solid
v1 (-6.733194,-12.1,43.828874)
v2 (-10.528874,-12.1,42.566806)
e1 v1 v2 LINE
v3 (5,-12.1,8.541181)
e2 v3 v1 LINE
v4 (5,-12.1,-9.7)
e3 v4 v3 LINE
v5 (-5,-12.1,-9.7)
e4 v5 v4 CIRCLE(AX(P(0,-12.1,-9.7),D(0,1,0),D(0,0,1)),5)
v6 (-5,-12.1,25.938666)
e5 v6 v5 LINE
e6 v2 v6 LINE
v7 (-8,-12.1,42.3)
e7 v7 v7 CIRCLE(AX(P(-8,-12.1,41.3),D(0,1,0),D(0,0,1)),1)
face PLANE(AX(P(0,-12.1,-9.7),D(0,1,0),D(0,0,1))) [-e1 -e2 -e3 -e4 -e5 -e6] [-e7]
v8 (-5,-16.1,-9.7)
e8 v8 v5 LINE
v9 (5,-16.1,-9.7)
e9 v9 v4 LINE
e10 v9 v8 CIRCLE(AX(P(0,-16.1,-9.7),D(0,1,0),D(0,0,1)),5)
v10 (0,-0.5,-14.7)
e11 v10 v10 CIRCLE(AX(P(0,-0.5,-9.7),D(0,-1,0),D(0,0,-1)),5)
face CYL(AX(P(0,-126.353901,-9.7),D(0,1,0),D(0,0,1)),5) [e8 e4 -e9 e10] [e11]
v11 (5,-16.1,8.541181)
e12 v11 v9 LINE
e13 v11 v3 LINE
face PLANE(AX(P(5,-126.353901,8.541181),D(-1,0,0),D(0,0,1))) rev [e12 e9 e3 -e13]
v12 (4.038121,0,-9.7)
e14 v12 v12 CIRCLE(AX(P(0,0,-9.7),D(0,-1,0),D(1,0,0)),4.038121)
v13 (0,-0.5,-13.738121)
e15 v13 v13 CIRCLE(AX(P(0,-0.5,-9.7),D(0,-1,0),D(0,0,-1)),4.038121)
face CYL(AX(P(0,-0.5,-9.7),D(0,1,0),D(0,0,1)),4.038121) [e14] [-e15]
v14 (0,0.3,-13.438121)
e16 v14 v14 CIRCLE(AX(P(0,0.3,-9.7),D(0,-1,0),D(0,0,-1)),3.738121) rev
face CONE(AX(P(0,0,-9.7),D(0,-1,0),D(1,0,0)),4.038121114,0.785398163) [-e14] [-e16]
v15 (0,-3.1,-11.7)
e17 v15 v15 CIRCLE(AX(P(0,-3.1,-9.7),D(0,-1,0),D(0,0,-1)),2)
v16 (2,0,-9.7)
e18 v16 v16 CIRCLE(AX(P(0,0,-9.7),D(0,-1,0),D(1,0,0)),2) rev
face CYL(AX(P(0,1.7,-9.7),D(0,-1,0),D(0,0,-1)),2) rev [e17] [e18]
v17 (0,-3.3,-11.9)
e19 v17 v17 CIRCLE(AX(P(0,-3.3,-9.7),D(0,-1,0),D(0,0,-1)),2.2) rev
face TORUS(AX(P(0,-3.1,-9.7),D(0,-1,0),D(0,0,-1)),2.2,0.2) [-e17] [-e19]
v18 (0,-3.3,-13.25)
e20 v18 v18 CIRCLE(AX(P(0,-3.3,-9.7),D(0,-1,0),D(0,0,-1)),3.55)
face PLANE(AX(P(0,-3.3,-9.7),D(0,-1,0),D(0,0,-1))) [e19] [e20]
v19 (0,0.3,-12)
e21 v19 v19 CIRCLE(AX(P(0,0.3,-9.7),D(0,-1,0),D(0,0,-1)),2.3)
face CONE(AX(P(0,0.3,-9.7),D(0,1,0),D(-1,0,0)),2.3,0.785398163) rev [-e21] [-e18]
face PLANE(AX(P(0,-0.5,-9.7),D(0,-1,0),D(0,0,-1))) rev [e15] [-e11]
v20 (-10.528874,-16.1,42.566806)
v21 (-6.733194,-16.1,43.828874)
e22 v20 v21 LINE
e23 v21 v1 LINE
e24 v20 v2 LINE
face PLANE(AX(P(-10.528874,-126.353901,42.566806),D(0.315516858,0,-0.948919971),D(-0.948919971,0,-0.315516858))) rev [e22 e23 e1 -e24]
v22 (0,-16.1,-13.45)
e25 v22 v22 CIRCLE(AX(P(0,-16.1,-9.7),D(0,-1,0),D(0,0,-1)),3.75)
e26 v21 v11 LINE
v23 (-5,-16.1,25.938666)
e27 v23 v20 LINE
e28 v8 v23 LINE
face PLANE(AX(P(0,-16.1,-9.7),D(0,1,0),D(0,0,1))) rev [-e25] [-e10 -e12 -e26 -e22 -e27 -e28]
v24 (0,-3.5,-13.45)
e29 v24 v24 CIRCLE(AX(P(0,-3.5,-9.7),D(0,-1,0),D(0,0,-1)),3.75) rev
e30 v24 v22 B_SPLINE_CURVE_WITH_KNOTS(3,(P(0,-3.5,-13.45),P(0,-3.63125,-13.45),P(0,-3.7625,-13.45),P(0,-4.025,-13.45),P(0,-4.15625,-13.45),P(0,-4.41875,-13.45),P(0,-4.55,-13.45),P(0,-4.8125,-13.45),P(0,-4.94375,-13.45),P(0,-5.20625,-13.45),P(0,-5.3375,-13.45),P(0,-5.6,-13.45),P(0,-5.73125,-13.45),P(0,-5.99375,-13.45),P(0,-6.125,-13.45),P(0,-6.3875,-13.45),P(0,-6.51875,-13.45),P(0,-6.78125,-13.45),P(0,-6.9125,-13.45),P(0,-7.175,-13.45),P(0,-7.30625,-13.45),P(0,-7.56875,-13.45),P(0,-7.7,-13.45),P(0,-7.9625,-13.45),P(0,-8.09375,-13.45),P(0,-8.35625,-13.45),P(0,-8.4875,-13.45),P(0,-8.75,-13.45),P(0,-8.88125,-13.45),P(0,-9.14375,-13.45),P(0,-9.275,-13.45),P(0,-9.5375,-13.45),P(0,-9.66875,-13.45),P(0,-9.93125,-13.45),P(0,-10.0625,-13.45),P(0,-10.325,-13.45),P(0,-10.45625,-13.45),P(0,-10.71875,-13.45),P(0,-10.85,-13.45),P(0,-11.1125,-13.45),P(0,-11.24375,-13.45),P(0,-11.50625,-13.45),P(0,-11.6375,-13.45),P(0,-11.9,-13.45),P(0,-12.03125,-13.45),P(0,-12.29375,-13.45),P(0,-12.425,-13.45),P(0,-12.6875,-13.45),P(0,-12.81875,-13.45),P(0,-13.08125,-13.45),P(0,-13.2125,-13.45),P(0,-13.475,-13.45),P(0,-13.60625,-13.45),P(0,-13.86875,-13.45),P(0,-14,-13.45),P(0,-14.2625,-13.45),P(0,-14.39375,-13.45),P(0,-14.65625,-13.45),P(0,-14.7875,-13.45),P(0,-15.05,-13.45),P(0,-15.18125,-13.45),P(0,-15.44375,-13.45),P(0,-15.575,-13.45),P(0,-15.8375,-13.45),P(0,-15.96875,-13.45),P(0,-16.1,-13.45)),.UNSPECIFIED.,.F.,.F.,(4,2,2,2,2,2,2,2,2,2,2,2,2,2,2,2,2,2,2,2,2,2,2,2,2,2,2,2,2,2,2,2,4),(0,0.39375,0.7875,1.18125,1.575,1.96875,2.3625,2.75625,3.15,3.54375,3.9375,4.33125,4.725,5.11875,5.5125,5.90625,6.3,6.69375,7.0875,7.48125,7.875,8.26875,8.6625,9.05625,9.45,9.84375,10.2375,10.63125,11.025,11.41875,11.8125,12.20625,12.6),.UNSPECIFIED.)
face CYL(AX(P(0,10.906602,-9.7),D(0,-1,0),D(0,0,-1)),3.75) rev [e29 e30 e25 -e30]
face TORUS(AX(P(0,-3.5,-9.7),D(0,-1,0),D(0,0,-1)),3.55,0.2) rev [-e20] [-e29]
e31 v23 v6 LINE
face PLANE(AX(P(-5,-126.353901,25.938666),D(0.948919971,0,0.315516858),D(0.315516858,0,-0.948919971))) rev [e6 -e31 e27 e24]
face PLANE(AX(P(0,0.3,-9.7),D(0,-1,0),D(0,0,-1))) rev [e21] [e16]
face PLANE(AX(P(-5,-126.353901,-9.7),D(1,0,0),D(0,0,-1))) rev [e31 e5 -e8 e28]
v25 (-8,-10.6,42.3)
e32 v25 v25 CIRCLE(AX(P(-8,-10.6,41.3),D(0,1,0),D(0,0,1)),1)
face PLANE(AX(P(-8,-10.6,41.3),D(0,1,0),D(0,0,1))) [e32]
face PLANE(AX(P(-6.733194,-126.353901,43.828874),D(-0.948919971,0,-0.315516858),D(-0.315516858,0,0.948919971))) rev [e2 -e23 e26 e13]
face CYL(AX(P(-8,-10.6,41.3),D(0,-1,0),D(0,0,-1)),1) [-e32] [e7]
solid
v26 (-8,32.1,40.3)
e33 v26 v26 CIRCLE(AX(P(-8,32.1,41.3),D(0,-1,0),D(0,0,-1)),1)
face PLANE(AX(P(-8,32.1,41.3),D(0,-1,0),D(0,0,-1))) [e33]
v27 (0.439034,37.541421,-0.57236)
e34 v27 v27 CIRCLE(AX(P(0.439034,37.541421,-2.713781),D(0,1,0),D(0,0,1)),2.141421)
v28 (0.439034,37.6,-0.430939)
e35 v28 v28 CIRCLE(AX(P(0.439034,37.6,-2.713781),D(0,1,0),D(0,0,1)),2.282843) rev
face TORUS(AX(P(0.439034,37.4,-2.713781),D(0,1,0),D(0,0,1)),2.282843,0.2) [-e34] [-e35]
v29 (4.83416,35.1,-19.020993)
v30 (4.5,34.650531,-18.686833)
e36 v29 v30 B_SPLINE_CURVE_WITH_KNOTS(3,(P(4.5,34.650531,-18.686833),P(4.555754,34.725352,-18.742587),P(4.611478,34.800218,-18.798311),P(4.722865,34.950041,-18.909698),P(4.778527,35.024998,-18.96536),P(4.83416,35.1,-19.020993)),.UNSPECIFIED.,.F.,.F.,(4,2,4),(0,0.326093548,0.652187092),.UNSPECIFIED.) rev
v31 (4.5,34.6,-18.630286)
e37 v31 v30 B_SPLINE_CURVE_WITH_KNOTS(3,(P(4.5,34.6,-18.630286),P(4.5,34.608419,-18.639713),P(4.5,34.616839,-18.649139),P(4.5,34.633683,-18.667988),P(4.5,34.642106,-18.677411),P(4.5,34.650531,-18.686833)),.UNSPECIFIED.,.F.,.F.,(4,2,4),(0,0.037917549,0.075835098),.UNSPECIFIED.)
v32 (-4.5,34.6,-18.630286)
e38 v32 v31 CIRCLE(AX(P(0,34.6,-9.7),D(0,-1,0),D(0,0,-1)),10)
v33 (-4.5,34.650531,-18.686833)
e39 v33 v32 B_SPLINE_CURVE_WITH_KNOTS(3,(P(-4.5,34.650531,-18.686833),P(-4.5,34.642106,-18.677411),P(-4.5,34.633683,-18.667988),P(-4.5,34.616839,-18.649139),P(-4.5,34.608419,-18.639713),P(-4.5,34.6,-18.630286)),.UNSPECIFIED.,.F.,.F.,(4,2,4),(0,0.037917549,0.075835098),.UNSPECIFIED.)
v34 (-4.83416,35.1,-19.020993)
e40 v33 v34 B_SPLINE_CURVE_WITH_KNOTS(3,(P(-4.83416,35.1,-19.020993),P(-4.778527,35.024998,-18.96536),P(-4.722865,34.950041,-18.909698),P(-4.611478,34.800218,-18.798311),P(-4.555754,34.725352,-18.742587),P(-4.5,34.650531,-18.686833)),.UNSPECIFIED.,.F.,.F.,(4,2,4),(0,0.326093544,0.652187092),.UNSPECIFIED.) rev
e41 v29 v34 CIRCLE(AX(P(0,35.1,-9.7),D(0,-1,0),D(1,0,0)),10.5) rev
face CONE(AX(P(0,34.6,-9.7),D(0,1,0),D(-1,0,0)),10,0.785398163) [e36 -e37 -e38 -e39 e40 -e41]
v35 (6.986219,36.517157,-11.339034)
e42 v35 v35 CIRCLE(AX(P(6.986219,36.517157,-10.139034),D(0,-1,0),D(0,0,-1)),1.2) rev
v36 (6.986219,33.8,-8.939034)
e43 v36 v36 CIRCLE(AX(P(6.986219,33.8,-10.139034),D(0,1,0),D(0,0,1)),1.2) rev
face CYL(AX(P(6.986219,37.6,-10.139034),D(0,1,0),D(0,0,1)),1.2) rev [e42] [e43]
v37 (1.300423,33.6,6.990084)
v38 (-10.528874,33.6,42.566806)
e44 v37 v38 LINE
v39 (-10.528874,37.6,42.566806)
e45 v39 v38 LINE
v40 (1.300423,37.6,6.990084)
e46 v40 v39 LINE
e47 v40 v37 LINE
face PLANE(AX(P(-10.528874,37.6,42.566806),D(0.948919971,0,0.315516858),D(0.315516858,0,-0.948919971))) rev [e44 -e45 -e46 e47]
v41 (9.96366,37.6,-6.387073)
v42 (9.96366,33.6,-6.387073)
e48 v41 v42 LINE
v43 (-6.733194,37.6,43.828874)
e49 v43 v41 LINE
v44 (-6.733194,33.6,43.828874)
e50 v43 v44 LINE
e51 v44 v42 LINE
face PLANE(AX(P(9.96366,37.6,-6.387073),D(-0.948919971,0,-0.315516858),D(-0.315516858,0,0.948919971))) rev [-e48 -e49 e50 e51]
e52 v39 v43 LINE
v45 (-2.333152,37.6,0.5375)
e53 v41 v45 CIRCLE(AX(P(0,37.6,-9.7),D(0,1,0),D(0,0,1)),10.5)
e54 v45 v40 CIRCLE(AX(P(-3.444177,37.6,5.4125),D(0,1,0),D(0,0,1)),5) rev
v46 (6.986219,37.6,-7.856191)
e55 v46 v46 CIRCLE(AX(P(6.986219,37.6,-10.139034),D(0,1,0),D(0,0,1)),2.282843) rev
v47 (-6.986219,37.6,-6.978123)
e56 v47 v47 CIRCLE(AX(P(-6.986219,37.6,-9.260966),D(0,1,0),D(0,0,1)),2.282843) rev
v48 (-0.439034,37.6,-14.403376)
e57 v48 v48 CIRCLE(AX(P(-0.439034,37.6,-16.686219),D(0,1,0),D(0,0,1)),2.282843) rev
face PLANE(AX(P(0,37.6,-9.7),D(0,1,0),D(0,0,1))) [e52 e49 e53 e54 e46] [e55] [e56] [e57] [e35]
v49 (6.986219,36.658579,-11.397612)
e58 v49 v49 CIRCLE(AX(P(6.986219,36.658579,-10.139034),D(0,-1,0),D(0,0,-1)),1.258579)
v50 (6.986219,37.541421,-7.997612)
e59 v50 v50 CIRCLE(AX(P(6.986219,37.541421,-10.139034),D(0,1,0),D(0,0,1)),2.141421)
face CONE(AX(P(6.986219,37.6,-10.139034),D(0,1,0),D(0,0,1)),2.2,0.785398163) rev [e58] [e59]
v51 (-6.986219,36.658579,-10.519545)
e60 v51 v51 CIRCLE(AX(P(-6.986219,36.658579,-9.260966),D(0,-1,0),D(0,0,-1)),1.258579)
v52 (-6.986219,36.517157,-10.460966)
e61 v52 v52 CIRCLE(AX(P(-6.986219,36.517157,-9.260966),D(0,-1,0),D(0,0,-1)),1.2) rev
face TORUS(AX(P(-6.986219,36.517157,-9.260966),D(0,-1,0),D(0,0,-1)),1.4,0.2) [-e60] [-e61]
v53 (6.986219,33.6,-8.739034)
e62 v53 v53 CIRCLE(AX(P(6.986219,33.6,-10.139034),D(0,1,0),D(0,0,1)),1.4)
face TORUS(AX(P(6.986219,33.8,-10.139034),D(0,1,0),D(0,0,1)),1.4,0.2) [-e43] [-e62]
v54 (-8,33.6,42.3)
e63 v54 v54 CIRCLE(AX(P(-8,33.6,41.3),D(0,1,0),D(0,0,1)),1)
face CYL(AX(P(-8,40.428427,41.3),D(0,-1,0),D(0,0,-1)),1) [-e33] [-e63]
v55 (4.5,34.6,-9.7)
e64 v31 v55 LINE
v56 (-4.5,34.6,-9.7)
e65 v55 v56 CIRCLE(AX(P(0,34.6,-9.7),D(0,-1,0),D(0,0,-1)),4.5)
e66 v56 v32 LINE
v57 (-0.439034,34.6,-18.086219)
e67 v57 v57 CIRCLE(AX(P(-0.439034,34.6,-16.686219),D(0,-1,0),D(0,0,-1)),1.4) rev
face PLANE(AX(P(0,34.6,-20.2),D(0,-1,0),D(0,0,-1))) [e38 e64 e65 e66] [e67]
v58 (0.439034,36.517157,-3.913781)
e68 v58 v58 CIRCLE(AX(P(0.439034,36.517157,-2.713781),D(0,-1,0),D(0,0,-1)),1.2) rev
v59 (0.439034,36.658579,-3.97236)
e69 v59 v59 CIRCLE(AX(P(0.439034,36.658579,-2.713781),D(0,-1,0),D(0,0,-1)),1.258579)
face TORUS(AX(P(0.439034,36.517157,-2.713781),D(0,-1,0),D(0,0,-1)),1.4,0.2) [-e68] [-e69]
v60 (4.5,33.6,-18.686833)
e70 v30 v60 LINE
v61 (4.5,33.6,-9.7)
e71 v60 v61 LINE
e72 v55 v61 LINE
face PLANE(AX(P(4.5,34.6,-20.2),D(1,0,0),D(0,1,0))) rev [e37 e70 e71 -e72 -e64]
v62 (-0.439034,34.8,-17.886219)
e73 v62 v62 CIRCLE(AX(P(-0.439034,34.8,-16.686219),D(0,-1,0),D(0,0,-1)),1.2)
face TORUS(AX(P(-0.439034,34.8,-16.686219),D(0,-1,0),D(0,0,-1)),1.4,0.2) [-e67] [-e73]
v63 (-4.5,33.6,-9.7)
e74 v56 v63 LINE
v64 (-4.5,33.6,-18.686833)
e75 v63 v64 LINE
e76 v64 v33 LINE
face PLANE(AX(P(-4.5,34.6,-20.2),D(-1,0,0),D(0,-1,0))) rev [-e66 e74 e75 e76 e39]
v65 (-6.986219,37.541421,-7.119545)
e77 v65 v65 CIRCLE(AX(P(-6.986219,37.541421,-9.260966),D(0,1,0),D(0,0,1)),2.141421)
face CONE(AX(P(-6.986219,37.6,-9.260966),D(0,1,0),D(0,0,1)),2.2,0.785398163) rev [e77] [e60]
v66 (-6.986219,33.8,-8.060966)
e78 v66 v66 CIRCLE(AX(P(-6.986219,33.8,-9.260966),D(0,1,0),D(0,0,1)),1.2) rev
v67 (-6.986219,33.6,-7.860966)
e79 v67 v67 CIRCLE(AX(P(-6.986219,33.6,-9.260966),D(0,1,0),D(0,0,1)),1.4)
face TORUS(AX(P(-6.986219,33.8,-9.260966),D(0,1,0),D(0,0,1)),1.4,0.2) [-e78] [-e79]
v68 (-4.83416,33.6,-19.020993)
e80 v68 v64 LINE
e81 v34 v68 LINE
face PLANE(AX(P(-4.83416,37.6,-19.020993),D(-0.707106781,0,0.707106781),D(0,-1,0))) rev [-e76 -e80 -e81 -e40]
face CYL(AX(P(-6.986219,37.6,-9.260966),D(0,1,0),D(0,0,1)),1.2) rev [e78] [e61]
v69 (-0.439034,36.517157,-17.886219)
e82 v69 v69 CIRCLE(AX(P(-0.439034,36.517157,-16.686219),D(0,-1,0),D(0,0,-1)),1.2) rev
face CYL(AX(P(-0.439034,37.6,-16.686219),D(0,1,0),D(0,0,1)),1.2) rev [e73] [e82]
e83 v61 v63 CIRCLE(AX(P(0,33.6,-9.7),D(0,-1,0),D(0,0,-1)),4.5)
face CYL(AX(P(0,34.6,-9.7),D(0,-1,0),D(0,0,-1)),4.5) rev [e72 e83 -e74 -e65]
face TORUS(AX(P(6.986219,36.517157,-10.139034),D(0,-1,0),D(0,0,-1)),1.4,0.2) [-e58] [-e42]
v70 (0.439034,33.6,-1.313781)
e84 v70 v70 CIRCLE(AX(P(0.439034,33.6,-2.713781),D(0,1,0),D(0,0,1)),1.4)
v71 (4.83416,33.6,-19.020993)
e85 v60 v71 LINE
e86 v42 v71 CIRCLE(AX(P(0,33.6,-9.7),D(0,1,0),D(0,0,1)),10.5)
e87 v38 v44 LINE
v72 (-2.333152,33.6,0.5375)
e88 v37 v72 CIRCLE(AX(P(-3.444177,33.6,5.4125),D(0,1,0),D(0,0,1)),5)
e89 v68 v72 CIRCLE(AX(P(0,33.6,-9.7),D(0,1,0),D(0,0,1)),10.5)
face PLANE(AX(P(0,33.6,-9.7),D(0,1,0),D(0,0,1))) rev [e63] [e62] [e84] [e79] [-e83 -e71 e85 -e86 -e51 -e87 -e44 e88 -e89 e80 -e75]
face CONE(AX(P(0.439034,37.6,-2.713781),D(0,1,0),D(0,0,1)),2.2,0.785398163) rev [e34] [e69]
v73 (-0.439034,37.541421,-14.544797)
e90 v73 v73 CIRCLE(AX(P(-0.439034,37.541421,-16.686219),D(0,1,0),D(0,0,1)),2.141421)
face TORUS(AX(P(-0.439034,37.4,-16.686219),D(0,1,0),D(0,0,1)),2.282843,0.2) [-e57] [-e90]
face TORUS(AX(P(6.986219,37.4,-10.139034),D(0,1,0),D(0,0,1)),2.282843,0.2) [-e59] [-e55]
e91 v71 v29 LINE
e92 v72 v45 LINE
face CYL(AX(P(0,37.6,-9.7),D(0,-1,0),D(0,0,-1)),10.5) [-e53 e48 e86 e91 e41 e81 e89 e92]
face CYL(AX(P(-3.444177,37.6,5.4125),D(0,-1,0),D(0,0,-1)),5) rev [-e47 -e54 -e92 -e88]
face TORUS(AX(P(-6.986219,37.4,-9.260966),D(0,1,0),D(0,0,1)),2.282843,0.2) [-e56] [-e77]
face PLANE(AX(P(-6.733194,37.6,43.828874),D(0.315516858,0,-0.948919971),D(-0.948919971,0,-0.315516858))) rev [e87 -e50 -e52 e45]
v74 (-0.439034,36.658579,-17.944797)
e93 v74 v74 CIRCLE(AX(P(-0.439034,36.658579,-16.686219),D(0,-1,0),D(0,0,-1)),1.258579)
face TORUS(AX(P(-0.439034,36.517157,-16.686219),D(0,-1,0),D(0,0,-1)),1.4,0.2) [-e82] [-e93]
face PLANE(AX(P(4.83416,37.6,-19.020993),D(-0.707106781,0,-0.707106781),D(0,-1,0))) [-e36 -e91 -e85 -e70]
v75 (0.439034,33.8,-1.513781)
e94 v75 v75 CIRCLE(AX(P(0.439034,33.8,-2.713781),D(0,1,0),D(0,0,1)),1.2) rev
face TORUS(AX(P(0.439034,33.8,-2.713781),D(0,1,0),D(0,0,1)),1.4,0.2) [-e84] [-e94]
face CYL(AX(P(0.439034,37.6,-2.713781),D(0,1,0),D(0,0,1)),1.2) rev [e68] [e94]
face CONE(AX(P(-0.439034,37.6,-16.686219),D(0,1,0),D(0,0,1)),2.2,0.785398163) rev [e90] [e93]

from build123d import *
from build123d.topology import SkipClean

# Parameters (mm, degrees)
SKETCH2_R                                           = 0.5
BOSS_EXTRUDE1_DEPTH                                 = 4
CSK_FOR_M2_COUNTERSUNK_FLAT_HEAD_SCREW1_D           = 2.4
CSK_FOR_M2_COUNTERSUNK_FLAT_HEAD_SCREW1_DEPTH       = 4
CSK_FOR_M2_COUNTERSUNK_FLAT_HEAD_SCREW1_CSINK_D     = 4.4
CSK_FOR_M2_COUNTERSUNK_FLAT_HEAD_SCREW1_CSINK_ANGLE = 90
CSK_FOR_M2_COUNTERSUNK_FLAT_HEAD_SCREW1_TIP         = 0.721032743
CUT_EXTRUDE1_DEPTH                                  = 1
BOSS_EXTRUDE2_START                                 = 0.2
SKETCH6_R                                           = 4.038121114
BOSS_EXTRUDE2_DEPTH                                 = 0.8
BOSS_EXTRUDE3_DEPTH                                 = 15.6
SKETCH11_R                                          = 3.75
CUT_EXTRUDE3_DEPTH                                  = 12.8
SKETCH10_R                                          = 2
CUT_EXTRUDE2_DEPTH                                  = 5
CHAMFER1_SIZE                                       = 0.3
FILLET3_R                                           = 0.2
CHAMFER2_SIZE                                       = 0.5
FILLET4_R                                           = 0.2
FILLET6_R                                           = 5
CUT_EXTRUDE4_DEPTH                                  = 11.6
SKETCH15_R                                          = 1
BOSS_EXTRUDE4_DEPTH                                 = 1.5
BOSS_EXTRUDE5_DEPTH                                 = 1.5
BOSS_EXTRUDE5_DEPTH_BACK                            = 4
SKETCH16_R                                          = 1


with BuildPart() as part:
    # Sketch2 → Boss-Extrude1 (new body)
    with BuildSketch(Plane(origin=(0, 33.6, 0), x_dir=(1, 0, 0), z_dir=(0, 1, 0))):
        with BuildLine():
            Line((9.9636597, 6.387072988), (-6.733193774, -43.828873659))
            Line((-6.733193774, -43.828873659), (-10.528873659, -42.566806226))
            Line((-10.528873659, -42.566806226), (3.566161148, -0.175854124))
            ThreePointArc((3.566161148, -0.175854124), (-7.518777568, 17.029255343), (9.9636597, 6.387072988))
        make_face()
        with Locations(Location((-8, -41.3, 0), (0, 0, 270))):
            Circle(SKETCH2_R, mode=Mode.SUBTRACT)
    extrude(amount=BOSS_EXTRUDE1_DEPTH)

    # CSK for M2 Countersunk Flat Head Screw1
    with Locations(Plane(origin=(0, 37.6, 0), x_dir=(1, 0, 0), z_dir=(0, 1, 0))):
        with Locations((0.439033788, 2.713781471), (6.986218529, 10.139033788), (-0.439033788, 16.686218529), (-6.986218529, 9.260966212)):
            CounterSinkHole(CSK_FOR_M2_COUNTERSUNK_FLAT_HEAD_SCREW1_D / 2, CSK_FOR_M2_COUNTERSUNK_FLAT_HEAD_SCREW1_CSINK_D / 2, depth=CSK_FOR_M2_COUNTERSUNK_FLAT_HEAD_SCREW1_DEPTH, counter_sink_angle=CSK_FOR_M2_COUNTERSUNK_FLAT_HEAD_SCREW1_CSINK_ANGLE)
            with Locations((0, 0, -(CSK_FOR_M2_COUNTERSUNK_FLAT_HEAD_SCREW1_DEPTH + CSK_FOR_M2_COUNTERSUNK_FLAT_HEAD_SCREW1_TIP / 2))):  # 118° drill point
                Cone(0, CSK_FOR_M2_COUNTERSUNK_FLAT_HEAD_SCREW1_D / 2, CSK_FOR_M2_COUNTERSUNK_FLAT_HEAD_SCREW1_TIP, mode=Mode.SUBTRACT)

    # Sketch5 → Cut-Extrude1 (cut)
    with BuildSketch(Plane.XZ.offset(-33.6)):
        with BuildLine():
            Line((-4.5, -20.2), (-4.5, -9.7))
            ThreePointArc((-4.5, -9.7), (0, -5.2), (4.5, -9.7))
            Line((4.5, -9.7), (4.5, -20.2))
            ThreePointArc((4.5, -20.2), (0, -24.7), (-4.5, -20.2))
        make_face()
    extrude(amount=-CUT_EXTRUDE1_DEPTH, mode=Mode.SUBTRACT)

    # Chamfer2
    # the kernel refuses this chamfer: 0.5, 0.37535302 mm, written as the material it takes off along each edge
    with BuildSketch(Plane(origin=(4.5, 34.6, -19.186832981), x_dir=(0.8957520847701005, 0, 0.4445539366938715), z_dir=(0, -1, 0))) as chamfer2_piece_1:
        with BuildLine():
            Line((0.373049134, 0), (CHAMFER2_SIZE * 0.444553936694, CHAMFER2_SIZE * 0.89575208477))
            Line((CHAMFER2_SIZE * 0.444553936694, CHAMFER2_SIZE * 0.89575208477), (0, 0))
            ThreePointArc((0, 0), (0.189712645, -0.001656381), (0.373049134, 0))
        make_face()
    extrude(amount=2.285841494, mode=Mode.SUBTRACT)
    with BuildSketch(Plane(origin=(-4.5, 34.6, -19.186832981), x_dir=(-0.8957520847700934, 0, 0.4445539366938859), z_dir=(0, -1, 0))) as chamfer2_piece_2:
        with BuildLine():
            Line((0.373049134, 0), (CHAMFER2_SIZE * 0.444553936694, -CHAMFER2_SIZE * 0.89575208477))
            Line((CHAMFER2_SIZE * 0.444553936694, -CHAMFER2_SIZE * 0.89575208477), (0, 0))
            ThreePointArc((0, 0), (0.189712645, 0.001656381), (0.373049134, 0))
        make_face()
    extrude(amount=2.285841494, mode=Mode.SUBTRACT)
    with BuildSketch(Plane(origin=(0, 34.6, -9.7), x_dir=(-0.5357432905270892, 0, -0.8443809132466265), z_dir=(-0.8443809132466265, 0, 0.5357432905270892))) as chamfer2_piece_3_section:
        Polygon((10.5, -CHAMFER2_SIZE), (10.5 - CHAMFER2_SIZE, 0), (10.5, 0), align=None)
    chamfer2_piece_3 = revolve(axis=Axis((0, 34.6, -9.7), (0, -1, 0)), revolution_arc=64.788667193, mode=Mode.PRIVATE)
    chamfer2_piece_3 = split(chamfer2_piece_3, bisect_by=Plane(origin=(-4.5, 34.6, -9.7), z_dir=(1, 0, 0)), keep=Keep.TOP, mode=Mode.PRIVATE)
    chamfer2_piece_3 = split(chamfer2_piece_3, bisect_by=Plane(origin=(4.5, 34.6, -9.7), z_dir=(-1, 0, 0)), keep=Keep.TOP, mode=Mode.PRIVATE)
    add(chamfer2_piece_3, mode=Mode.SUBTRACT)
    with BuildSketch(Plane(origin=(0, 34.6, -9.7), x_dir=(-0.5357432905270892, 0, -0.8443809132466265), z_dir=(-0.8443809132466265, 0, 0.5357432905270892))) as chamfer2_piece_4a_section:
        Polygon((10.5, -CHAMFER2_SIZE), (10.5 - CHAMFER2_SIZE, 0), (10.5, 0), align=None)
    chamfer2_piece_4a = revolve(axis=Axis((0, 34.6, -9.7), (0, -1, 0)), revolution_arc=64.788667193, mode=Mode.PRIVATE)
    chamfer2_piece_4a = split(chamfer2_piece_4a, bisect_by=Plane(origin=(4.5, 34.6, -9.7), z_dir=(1, 0, 0)), keep=Keep.TOP, mode=Mode.PRIVATE)
    with BuildSketch(Plane(origin=(4.5, 35.885841494, -19.186832981), x_dir=(0.8957520847701005, 0, 0.4445539366938715), z_dir=(0, -1, 0))) as chamfer2_piece_4b_section:
        with BuildLine():
            Line((0.373049134, 0), (CHAMFER2_SIZE * 0.444553936694, CHAMFER2_SIZE * 0.89575208477))
            Line((CHAMFER2_SIZE * 0.444553936694, CHAMFER2_SIZE * 0.89575208477), (0, 0))
            ThreePointArc((0, 0), (0.189712645, -0.001656381), (0.373049134, 0))
        make_face()
    chamfer2_piece_4b = extrude(amount=3.571682988, mode=Mode.PRIVATE)
    chamfer2_piece_4b = split(chamfer2_piece_4b, bisect_by=Plane(origin=(4.5, 34.6, -19.186832981), z_dir=(0, 1, 0)), keep=Keep.TOP, mode=Mode.PRIVATE)
    chamfer2_piece_4 = chamfer2_piece_4a & chamfer2_piece_4b
    add(chamfer2_piece_4, mode=Mode.SUBTRACT)
    with BuildSketch(Plane(origin=(-4.5, 35.885841494, -19.186832981), x_dir=(-0.8957520847700934, 0, 0.4445539366938859), z_dir=(0, -1, 0))) as chamfer2_piece_5a_section:
        with BuildLine():
            Line((0.373049134, 0), (CHAMFER2_SIZE * 0.444553936694, -CHAMFER2_SIZE * 0.89575208477))
            Line((CHAMFER2_SIZE * 0.444553936694, -CHAMFER2_SIZE * 0.89575208477), (0, 0))
            ThreePointArc((0, 0), (0.189712645, 0.001656381), (0.373049134, 0))
        make_face()
    chamfer2_piece_5a = extrude(amount=3.571682988, mode=Mode.PRIVATE)
    chamfer2_piece_5a = split(chamfer2_piece_5a, bisect_by=Plane(origin=(-4.5, 34.6, -19.186832981), z_dir=(0, 1, 0)), keep=Keep.TOP, mode=Mode.PRIVATE)
    with BuildSketch(Plane(origin=(0, 34.6, -9.7), x_dir=(-0.5357432905270892, 0, -0.8443809132466265), z_dir=(-0.8443809132466265, 0, 0.5357432905270892))) as chamfer2_piece_5b_section:
        Polygon((10.5, -CHAMFER2_SIZE), (10.5 - CHAMFER2_SIZE, 0), (10.5, 0), align=None)
    chamfer2_piece_5b = revolve(axis=Axis((0, 34.6, -9.7), (0, -1, 0)), revolution_arc=64.788667193, mode=Mode.PRIVATE)
    chamfer2_piece_5b = split(chamfer2_piece_5b, bisect_by=Plane(origin=(-4.5, 34.6, -9.7), z_dir=(-1, 0, 0)), keep=Keep.TOP, mode=Mode.PRIVATE)
    chamfer2_piece_5 = chamfer2_piece_5a & chamfer2_piece_5b
    add(chamfer2_piece_5, mode=Mode.SUBTRACT)

    # Fillet4
    fillet4_edges = [part.edges().sort_by_distance(p)[0] for p in [
        (-4.786218529, 37.6, -9.260966212),
        (-5.786218529, 33.6, -9.260966212),
        (-5.786218529, 36.6, -9.260966212),
        (1.760966212, 37.6, -16.686218529),
        (0.760966212, 36.6, -16.686218529),
        (9.186218529, 37.6, -10.139033788),
        (8.186218529, 33.6, -10.139033788),
        (8.186218529, 36.6, -10.139033788),
        (2.639033788, 37.6, -2.713781471),
        (1.639033788, 33.6, -2.713781471),
        (1.639033788, 36.6, -2.713781471),
        (0.760966212, 34.6, -16.686218529),
    ]]
    fillet(fillet4_edges, radius=FILLET4_R)

    # Fillet6
    fillet6_edges = [part.edges().sort_by_distance(p)[0] for p in [
        (3.566161148, 35.6, 0.175854124),
    ]]
    fillet(fillet6_edges, radius=FILLET6_R)

    # Sketch16 → Boss-Extrude5 (add, two sides: drawn at the far end of the back side and taken through both)
    with BuildSketch(Plane.XZ.offset(-33.6).offset(-BOSS_EXTRUDE5_DEPTH_BACK)):
        with Locations(Location((-8, 41.3, 0), (0, 0, 90))):
            Circle(SKETCH16_R)
    extrude(amount=BOSS_EXTRUDE5_DEPTH + BOSS_EXTRUDE5_DEPTH_BACK)


with BuildPart() as body_2:
    # Sketch6 → Boss-Extrude2 (new body)
    with BuildSketch(Plane.XZ.offset(-0.5).offset(BOSS_EXTRUDE2_START)):
        with Locations(Location((0, -9.7, 0), (0, 0, 270))):
            Circle(SKETCH6_R)
    extrude(amount=BOSS_EXTRUDE2_DEPTH)

    # Sketch7 → Boss-Extrude3 (add)
    with BuildSketch(Plane.XZ.offset(0.5)):
        with BuildLine():
            Line((-5, -9.7), (-5, 25.938665772))
            Line((-5, 25.938665772), (-10.528873659, 42.566806226))
            Line((-10.528873659, 42.566806226), (-6.733193774, 43.828873659))
            Line((-6.733193774, 43.828873659), (5, 8.541181072))
            Line((5, 8.541181072), (5, -9.7))
            ThreePointArc((5, -9.7), (0, -14.7), (-5, -9.7))
        make_face()
    extrude(amount=BOSS_EXTRUDE3_DEPTH)

    # Sketch11 → Cut-Extrude3 (cut)
    with BuildSketch(Plane.XZ.offset(16.1)):
        with Locations(Location((0, -9.7, 0), (0, 0, 270))):
            Circle(SKETCH11_R)
    extrude(amount=-CUT_EXTRUDE3_DEPTH, mode=Mode.SUBTRACT)

    # Sketch10 → Cut-Extrude2 (cut)
    with BuildSketch(Plane.XZ.offset(3.3)):
        with Locations(Location((0, -9.7, 0), (0, 0, 270))):
            Circle(SKETCH10_R)
    extrude(amount=-CUT_EXTRUDE2_DEPTH, mode=Mode.SUBTRACT)

    # Chamfer1
    chamfer1_edges = [body_2.edges().sort_by_distance(p)[0] for p in [
        (0, 0.3, -5.661878886),
        (0, 0.3, -7.7),
    ]]
    chamfer(chamfer1_edges, length=CHAMFER1_SIZE)

    # Fillet3
    fillet3_edges = [body_2.edges().sort_by_distance(p)[0] for p in [
        (0, -3.3, -5.95),
        (0, -3.3, -7.7),
    ]]
    fillet(fillet3_edges, radius=FILLET3_R)

    # Sketch12 → Cut-Extrude4 (cut)
    with SkipClean():  # the faces are left unmerged after this step: merging them gives an invalid solid
        with BuildSketch(Plane(origin=(0, -0.5, 0), x_dir=(1, 0, 0), z_dir=(0, 1, 0))):
            with BuildLine():
                Line((-10.528873659, -42.566806226), (-6.733193774, -43.828873659))
                Line((-6.733193774, -43.828873659), (5, -8.541181072))
                Line((5, -8.541181072), (5, 9.7))
                ThreePointArc((5, 9.7), (0, 4.7), (-5, 9.7))
                Line((-5, 9.7), (-5, -25.938665772))
                Line((-5, -25.938665772), (-10.528873659, -42.566806226))
            make_face()
        extrude(amount=-CUT_EXTRUDE4_DEPTH, mode=Mode.SUBTRACT)

    # Sketch15 → Boss-Extrude4 (add)
    with SkipClean():  # the faces are left unmerged after this step: merging them gives an invalid solid
        with BuildSketch(Plane(origin=(0, -12.1, 0), x_dir=(1, 0, 0), z_dir=(0, 1, 0))):
            with Locations(Location((-8, -41.3, 0), (0, 0, 270))):
                Circle(SKETCH15_R)
        extrude(amount=BOSS_EXTRUDE4_DEPTH)


solid = Compound([part.part, body_2.part])
